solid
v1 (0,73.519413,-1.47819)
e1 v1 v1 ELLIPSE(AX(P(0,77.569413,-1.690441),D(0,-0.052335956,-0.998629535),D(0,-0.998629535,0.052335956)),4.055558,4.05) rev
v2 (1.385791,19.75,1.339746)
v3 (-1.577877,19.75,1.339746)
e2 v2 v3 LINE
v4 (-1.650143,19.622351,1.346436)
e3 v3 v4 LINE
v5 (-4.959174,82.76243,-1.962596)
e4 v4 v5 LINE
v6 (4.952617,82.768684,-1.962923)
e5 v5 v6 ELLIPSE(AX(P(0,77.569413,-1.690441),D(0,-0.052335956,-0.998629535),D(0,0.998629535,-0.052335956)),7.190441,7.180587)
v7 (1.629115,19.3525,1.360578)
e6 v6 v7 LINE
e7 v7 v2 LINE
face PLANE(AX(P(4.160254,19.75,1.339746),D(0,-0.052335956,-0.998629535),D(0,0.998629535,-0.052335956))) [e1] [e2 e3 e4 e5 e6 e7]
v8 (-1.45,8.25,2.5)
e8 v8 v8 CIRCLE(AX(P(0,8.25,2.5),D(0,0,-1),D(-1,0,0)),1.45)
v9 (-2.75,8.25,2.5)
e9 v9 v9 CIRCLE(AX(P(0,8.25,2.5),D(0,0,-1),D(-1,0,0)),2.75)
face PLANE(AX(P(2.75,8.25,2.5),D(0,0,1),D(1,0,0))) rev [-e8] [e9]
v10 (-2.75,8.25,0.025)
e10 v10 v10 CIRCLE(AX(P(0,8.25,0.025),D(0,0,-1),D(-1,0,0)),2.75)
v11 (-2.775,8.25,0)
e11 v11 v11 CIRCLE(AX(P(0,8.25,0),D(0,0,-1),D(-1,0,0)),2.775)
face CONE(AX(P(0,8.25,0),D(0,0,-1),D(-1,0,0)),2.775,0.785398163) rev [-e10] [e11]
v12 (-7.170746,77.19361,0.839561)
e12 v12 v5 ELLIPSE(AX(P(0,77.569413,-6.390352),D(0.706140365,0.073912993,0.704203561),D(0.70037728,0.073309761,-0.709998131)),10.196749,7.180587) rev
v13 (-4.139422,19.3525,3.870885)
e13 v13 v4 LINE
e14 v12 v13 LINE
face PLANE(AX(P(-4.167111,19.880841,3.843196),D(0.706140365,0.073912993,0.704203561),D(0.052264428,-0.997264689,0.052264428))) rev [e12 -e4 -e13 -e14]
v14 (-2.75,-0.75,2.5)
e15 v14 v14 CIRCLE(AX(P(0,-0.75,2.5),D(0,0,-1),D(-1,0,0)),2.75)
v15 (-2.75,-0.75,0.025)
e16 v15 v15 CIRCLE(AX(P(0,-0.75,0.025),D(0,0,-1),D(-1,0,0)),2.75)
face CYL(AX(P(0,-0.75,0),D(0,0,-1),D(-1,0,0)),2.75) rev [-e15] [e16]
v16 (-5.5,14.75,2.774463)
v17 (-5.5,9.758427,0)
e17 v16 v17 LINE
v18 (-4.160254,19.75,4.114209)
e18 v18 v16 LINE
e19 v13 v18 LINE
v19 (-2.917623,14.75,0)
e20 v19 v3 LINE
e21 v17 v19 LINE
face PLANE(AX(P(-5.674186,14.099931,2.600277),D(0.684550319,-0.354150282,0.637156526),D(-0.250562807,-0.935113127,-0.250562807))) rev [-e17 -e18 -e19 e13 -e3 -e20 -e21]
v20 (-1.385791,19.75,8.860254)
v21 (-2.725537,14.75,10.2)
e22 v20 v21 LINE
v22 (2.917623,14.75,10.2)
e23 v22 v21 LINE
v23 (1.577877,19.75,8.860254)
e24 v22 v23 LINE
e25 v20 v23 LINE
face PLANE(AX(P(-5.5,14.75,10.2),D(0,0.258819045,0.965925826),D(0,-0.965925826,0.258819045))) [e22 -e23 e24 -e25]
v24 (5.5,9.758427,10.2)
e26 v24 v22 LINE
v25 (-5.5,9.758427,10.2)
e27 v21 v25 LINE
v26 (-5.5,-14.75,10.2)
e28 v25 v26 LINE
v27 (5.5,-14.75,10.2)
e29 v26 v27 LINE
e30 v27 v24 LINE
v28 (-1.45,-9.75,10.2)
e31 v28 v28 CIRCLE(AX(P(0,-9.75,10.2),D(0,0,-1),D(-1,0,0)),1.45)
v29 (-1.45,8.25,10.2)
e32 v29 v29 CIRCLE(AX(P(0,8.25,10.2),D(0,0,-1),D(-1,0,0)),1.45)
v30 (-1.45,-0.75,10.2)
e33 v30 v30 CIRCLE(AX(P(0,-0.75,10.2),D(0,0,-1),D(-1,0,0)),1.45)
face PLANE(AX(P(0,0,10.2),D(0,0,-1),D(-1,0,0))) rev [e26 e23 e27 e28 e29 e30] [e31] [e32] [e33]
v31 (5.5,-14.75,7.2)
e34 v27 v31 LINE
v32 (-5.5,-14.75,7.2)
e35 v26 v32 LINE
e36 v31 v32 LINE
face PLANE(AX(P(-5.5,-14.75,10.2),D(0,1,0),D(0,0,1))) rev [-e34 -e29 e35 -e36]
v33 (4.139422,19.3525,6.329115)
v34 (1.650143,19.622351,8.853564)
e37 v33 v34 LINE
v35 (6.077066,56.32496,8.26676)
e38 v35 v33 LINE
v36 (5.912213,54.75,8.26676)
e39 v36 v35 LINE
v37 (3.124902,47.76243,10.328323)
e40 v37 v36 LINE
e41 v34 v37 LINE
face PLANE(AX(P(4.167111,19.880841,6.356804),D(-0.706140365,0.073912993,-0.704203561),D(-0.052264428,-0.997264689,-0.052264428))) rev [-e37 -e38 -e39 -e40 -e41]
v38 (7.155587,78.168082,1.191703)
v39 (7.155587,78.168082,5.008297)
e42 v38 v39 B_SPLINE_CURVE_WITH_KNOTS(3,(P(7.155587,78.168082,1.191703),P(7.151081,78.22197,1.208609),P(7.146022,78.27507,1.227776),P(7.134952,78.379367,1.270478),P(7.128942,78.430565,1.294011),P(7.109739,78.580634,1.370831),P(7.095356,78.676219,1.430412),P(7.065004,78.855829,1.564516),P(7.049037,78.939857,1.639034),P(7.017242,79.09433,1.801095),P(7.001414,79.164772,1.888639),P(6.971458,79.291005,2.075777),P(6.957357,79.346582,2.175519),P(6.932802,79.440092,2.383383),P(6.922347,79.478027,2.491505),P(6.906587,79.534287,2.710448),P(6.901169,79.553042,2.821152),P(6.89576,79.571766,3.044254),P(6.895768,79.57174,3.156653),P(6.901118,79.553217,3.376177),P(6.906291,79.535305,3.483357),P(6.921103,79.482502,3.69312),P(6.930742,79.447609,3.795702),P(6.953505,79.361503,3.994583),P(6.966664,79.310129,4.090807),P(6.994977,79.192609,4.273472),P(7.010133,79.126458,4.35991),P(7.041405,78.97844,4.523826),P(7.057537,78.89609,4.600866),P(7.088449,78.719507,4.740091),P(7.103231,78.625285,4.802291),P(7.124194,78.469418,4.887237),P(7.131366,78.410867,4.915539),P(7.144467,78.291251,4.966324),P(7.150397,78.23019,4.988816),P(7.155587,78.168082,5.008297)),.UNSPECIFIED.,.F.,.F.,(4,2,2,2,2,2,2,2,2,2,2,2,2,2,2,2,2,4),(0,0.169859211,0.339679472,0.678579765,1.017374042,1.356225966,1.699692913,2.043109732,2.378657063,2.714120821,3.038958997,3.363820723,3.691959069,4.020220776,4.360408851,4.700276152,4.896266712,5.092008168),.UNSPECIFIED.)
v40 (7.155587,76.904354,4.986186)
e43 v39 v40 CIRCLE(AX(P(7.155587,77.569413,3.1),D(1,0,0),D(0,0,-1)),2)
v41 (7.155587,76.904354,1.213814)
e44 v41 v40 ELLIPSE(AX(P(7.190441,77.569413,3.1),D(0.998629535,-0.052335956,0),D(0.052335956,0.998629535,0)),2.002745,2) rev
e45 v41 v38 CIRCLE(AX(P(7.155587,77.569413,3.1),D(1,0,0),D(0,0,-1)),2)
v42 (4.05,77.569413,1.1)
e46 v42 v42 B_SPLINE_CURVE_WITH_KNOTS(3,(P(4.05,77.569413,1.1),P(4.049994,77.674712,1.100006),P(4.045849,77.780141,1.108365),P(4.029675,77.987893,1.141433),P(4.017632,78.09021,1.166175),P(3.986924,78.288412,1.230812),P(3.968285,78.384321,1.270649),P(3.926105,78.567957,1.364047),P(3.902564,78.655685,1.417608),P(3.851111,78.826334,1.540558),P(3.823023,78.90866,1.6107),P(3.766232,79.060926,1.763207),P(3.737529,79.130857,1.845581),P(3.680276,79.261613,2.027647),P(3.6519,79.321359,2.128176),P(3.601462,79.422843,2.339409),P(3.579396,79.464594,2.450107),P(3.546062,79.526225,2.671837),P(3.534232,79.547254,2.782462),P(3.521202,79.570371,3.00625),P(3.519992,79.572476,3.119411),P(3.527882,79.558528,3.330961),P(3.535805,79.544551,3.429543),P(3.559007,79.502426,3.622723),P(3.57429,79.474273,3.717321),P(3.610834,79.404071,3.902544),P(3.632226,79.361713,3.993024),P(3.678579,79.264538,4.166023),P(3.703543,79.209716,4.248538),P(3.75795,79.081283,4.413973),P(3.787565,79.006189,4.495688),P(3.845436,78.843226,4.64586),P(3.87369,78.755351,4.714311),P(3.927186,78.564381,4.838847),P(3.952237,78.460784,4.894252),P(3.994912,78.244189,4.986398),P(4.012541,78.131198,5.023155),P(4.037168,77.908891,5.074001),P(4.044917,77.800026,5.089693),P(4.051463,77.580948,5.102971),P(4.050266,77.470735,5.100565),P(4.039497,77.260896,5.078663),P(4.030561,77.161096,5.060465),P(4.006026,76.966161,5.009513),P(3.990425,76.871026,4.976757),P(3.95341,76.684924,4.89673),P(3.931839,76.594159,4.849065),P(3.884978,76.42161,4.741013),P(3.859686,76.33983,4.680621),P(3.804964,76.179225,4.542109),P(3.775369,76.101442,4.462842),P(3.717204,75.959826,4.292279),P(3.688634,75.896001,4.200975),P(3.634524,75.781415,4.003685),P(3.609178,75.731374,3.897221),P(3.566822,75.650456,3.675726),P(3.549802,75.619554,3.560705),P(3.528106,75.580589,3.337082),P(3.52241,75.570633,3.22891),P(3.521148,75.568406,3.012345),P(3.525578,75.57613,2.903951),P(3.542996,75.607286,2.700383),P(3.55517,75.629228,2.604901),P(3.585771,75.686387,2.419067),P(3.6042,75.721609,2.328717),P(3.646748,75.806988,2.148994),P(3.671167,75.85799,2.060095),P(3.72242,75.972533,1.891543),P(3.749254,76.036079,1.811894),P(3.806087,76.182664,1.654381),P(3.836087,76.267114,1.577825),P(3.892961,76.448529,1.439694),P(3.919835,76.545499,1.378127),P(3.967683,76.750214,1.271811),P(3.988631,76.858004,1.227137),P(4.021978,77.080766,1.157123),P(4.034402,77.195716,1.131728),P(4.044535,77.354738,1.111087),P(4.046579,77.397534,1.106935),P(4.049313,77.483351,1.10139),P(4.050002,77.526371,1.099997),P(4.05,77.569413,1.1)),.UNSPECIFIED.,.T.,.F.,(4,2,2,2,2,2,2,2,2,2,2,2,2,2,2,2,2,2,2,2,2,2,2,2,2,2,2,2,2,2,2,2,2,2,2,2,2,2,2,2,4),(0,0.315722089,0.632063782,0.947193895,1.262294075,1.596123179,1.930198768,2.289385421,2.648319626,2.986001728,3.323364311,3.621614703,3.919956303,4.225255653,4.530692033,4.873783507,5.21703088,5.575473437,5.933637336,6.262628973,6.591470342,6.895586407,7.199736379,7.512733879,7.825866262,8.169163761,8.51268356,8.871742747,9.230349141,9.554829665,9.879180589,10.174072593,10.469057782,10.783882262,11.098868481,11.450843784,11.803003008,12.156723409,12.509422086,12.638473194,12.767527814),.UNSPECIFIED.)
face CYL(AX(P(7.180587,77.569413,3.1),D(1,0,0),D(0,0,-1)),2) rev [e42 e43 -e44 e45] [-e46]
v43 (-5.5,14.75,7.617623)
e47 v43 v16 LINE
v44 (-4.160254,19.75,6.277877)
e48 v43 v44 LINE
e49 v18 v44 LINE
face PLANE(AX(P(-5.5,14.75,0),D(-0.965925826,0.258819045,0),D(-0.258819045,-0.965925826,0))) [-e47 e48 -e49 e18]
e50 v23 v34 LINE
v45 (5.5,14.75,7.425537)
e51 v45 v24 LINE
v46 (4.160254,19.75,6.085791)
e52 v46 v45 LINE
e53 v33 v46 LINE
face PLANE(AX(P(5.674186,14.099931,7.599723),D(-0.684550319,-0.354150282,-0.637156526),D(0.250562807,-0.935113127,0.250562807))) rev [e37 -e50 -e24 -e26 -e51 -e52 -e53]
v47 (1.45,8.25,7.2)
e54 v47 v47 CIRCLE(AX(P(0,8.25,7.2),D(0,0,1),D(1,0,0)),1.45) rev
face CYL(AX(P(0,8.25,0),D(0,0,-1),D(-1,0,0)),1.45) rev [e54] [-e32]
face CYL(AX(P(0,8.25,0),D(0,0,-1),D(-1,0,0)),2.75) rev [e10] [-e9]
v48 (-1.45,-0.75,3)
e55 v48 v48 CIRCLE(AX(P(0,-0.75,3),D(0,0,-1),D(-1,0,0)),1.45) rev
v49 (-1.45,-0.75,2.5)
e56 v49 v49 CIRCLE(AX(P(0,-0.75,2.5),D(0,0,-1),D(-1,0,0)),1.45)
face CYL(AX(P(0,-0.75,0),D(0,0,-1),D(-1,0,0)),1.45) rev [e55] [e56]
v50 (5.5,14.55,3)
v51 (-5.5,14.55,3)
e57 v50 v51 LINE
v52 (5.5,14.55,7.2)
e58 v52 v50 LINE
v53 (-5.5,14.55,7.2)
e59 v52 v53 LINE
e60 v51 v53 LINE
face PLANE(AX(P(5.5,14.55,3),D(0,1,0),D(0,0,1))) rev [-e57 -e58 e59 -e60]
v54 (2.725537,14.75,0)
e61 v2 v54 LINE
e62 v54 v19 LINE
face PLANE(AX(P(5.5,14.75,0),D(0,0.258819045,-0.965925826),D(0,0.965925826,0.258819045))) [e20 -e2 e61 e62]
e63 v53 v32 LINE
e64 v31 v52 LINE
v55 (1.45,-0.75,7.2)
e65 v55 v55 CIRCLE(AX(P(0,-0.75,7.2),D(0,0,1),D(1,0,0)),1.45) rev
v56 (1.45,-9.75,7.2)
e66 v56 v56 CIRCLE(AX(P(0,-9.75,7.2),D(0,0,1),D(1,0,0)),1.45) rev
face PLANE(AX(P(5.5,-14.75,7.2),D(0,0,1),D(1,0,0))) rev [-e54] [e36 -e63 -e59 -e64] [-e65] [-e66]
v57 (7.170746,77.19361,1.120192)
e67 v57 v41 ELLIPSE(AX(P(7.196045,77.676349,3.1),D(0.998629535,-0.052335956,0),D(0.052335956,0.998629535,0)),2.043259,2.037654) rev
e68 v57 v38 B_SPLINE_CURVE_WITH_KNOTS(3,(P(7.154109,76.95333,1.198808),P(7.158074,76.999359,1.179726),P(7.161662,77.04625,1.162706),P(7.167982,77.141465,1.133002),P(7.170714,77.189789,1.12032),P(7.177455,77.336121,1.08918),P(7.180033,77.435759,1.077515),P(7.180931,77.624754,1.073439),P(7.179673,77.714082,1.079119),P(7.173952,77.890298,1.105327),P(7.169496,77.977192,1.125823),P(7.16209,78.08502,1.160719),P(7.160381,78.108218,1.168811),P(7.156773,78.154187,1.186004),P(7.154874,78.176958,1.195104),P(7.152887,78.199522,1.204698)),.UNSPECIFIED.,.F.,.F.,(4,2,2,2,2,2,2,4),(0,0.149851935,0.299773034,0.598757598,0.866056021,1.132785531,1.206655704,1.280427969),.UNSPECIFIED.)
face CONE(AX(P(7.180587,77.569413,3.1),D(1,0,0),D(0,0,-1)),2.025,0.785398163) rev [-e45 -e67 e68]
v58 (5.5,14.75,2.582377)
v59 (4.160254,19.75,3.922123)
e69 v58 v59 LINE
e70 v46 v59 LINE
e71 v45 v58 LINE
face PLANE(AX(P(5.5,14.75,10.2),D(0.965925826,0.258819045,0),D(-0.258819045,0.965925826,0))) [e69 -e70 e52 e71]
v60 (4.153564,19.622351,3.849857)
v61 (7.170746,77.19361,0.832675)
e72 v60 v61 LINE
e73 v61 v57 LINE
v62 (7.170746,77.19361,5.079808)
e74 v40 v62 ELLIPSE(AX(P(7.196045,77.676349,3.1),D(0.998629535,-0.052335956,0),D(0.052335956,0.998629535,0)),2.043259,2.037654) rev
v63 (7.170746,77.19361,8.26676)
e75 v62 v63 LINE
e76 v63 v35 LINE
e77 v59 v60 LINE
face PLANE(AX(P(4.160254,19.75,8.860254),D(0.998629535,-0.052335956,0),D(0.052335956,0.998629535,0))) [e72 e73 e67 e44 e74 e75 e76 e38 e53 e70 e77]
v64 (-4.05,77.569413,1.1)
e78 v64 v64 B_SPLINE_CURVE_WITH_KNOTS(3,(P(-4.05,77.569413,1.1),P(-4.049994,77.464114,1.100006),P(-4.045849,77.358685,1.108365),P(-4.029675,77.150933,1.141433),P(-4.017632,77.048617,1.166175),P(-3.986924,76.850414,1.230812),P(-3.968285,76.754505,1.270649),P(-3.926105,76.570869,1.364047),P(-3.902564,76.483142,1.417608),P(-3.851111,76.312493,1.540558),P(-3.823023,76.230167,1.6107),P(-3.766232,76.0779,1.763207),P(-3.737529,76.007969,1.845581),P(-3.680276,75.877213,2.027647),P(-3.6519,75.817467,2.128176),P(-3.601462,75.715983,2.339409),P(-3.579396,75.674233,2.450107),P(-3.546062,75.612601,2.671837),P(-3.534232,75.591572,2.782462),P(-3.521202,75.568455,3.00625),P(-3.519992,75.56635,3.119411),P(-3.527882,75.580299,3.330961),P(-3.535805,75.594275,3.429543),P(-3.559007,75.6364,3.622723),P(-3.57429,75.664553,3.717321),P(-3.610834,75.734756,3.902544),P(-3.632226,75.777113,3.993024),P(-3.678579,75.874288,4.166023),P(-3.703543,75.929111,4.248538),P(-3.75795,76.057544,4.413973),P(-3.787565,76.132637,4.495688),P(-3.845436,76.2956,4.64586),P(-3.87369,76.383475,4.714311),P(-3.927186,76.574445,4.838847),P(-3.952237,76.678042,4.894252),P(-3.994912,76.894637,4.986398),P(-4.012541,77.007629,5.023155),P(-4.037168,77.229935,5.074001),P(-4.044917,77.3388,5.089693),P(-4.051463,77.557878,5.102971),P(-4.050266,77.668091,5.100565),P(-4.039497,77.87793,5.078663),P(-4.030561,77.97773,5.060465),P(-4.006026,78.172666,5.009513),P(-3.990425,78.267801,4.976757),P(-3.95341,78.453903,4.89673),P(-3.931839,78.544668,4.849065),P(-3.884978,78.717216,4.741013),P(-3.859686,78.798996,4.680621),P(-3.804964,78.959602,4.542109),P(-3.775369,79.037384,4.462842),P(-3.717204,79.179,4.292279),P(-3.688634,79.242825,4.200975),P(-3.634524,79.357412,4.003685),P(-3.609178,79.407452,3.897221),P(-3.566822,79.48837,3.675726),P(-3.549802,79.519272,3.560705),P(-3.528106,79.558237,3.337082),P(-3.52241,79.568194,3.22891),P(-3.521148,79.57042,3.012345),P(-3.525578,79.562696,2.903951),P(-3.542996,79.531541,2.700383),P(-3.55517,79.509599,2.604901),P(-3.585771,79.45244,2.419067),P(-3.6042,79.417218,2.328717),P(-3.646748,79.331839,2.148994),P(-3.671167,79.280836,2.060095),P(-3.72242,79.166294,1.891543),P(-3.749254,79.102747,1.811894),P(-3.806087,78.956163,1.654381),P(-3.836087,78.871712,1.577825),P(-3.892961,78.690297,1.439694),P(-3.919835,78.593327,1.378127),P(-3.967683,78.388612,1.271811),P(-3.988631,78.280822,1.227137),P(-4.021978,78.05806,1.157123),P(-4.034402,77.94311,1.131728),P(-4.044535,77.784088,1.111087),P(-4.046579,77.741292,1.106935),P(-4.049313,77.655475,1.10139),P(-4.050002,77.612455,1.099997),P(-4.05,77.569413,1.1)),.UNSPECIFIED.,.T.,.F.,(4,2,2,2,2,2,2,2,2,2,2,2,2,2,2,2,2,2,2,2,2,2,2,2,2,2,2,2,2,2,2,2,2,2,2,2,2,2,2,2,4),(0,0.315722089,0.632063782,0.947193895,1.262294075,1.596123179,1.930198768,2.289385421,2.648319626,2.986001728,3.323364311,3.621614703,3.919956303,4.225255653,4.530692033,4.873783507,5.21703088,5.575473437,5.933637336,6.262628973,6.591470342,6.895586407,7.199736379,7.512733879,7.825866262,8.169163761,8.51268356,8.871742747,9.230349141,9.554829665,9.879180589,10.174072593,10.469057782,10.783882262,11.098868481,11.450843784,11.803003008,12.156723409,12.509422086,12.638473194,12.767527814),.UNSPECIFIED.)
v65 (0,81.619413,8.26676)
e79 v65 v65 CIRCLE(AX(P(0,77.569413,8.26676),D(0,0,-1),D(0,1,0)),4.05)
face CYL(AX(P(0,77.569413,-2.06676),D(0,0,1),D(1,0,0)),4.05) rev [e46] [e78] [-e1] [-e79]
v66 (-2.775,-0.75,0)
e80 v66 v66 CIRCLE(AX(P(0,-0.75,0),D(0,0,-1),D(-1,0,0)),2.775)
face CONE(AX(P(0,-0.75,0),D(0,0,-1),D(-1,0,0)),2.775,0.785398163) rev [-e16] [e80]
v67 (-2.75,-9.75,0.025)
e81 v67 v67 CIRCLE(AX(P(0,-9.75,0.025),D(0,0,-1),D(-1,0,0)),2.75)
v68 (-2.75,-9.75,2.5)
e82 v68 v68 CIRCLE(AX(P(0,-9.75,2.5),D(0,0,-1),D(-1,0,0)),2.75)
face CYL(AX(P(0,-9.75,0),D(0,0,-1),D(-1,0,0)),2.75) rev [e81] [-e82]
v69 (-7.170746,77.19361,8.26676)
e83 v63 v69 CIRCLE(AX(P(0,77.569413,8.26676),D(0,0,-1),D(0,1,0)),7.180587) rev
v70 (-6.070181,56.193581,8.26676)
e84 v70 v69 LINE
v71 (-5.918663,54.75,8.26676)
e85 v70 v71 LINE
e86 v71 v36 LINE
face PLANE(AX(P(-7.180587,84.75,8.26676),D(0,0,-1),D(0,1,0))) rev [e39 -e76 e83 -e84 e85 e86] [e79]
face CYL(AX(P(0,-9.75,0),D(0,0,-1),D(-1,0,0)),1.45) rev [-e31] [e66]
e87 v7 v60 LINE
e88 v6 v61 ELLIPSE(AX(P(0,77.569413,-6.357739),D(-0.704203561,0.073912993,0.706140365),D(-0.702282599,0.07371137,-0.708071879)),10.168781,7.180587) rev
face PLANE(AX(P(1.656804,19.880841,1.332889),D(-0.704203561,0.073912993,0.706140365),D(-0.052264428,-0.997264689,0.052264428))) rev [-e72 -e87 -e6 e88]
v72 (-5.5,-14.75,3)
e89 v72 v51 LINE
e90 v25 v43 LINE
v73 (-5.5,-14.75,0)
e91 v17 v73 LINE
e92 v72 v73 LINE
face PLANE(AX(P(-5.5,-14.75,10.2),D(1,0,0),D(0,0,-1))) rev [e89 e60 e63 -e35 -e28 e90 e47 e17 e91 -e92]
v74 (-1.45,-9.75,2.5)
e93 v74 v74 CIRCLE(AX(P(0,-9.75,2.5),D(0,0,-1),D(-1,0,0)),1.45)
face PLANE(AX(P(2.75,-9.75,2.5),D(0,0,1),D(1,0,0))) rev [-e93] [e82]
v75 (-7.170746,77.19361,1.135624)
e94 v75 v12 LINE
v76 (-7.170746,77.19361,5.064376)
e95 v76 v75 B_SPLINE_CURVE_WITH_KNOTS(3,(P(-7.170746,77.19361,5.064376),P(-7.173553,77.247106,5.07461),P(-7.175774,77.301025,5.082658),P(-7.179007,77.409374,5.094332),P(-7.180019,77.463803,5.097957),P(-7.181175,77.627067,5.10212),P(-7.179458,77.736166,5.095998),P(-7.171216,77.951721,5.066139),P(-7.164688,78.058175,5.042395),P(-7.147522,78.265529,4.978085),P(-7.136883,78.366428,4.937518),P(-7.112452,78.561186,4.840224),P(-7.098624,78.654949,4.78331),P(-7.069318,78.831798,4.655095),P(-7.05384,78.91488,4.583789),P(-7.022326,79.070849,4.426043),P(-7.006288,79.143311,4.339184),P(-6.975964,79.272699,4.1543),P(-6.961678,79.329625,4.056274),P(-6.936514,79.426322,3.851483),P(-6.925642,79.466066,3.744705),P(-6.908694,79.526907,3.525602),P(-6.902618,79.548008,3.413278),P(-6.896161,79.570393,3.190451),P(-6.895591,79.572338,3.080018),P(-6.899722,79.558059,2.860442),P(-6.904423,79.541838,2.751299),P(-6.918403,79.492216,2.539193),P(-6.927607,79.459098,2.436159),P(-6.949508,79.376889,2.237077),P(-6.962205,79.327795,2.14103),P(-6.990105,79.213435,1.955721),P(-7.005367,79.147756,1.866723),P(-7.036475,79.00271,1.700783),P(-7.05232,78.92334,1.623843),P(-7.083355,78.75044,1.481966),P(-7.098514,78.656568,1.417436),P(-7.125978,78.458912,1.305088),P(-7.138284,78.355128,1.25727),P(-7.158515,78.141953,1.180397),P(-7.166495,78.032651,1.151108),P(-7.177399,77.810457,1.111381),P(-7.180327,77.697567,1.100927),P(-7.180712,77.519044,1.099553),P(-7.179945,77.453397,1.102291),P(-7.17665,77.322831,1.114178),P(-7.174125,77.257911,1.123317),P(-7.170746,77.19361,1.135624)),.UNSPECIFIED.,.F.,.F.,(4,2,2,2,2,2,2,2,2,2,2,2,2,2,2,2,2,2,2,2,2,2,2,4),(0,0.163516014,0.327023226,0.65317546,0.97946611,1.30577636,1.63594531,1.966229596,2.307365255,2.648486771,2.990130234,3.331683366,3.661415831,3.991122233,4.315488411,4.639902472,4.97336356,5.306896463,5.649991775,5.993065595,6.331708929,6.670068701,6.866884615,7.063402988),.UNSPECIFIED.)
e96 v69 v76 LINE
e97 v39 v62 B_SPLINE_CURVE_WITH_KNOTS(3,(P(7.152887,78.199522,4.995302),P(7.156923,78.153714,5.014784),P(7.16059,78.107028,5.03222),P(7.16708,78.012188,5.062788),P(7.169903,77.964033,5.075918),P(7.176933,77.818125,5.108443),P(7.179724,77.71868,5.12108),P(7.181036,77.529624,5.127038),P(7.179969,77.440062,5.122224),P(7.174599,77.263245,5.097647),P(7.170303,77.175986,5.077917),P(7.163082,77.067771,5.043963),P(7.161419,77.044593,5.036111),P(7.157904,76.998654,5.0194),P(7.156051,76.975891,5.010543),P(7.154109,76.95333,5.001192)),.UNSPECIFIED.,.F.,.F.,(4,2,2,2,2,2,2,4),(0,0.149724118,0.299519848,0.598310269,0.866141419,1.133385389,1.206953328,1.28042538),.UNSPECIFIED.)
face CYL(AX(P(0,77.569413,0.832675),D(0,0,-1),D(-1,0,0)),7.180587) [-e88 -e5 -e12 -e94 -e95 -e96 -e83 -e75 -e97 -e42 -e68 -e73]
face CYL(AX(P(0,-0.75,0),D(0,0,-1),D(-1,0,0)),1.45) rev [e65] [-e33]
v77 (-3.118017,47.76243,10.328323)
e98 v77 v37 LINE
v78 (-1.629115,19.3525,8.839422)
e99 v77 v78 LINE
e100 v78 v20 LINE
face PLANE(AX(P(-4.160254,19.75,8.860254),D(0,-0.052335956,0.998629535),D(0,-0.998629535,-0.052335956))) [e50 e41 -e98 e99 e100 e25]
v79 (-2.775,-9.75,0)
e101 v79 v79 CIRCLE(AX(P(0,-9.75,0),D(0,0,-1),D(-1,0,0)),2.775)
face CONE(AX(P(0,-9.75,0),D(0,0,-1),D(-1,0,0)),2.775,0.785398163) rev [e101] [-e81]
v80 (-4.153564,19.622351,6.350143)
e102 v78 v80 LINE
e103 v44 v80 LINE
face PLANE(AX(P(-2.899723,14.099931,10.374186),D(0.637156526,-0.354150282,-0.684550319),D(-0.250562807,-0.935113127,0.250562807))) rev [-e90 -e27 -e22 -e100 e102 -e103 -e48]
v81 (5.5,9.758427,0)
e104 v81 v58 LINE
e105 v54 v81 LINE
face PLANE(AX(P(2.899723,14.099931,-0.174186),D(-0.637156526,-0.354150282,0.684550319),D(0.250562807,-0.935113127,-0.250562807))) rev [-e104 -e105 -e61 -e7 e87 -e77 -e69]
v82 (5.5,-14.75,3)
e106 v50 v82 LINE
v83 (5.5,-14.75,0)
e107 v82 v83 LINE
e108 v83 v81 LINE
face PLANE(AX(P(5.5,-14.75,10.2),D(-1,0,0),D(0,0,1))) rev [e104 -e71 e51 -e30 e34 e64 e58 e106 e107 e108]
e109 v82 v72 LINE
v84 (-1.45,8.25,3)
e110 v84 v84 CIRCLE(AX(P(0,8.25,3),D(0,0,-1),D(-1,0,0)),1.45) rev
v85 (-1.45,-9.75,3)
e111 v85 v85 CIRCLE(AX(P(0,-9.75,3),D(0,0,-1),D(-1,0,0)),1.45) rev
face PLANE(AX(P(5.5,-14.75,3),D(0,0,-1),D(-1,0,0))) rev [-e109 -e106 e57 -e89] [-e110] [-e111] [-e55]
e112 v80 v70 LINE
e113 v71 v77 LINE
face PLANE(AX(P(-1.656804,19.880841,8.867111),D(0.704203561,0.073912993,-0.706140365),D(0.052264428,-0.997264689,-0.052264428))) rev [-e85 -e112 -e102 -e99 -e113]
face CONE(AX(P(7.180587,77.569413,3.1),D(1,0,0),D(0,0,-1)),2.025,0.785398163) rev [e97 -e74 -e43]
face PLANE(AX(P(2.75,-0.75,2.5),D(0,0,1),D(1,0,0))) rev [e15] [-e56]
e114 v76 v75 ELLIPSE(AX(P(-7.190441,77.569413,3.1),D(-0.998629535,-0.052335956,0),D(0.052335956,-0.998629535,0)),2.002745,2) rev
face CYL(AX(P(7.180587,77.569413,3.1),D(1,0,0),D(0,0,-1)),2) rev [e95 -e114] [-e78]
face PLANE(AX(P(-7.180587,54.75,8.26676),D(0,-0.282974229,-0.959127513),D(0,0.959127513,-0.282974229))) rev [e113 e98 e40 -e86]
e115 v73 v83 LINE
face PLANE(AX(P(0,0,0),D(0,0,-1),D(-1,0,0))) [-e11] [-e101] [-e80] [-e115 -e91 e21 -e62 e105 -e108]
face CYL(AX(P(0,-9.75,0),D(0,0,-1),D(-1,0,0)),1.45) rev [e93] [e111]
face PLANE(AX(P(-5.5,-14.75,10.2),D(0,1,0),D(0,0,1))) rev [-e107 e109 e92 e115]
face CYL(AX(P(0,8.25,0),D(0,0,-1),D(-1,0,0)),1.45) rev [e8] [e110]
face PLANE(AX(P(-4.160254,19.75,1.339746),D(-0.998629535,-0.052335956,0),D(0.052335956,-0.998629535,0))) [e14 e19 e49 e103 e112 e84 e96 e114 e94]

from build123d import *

# Parameters (mm, degrees)
SKETCH1_W                       = 11
SKETCH1_H                       = 29.5
BOSS_EXTRUDE1_DEPTH             = 10.2
CBORE_FOR_M2_5_SHCS1_AT_2_COUNT = 2
CBORE_FOR_M2_5_SHCS1_AT_2_PITCH = 9
CBORE_FOR_M2_5_SHCS1_AT_3_COUNT = 2
CBORE_FOR_M2_5_SHCS1_AT_3_PITCH = 18
CUT_EXTRUDE1_DEPTH              = 22.038120163
CUT_EXTRUDE1_DEPTH_BACK         = 22.038120163
SKETCH5_W                       = 4.2
SKETCH5_H                       = 29.3
SKETCH6_W                       = 11
SKETCH6_H                       = 10.2
BOSS_EXTRUDE2_DEPTH             = 5
BOSS_EXTRUDE2_TAPER             = 15
SKETCH7_W                       = 8.320508076
SKETCH7_H                       = 7.520508076
BOSS_EXTRUDE3_DEPTH             = 65
BOSS_EXTRUDE3_DRAFT             = -3
CHAMFER1_SIZE                   = 2.685958206
CHAMFER1_SIZE_2                 = 2.5
CHAMFER1_SIZE_3                 = 2.506875868
FILLET1_R                       = 7.180587
CUT_EXTRUDE2_DEPTH              = 87.566929667
CUT_EXTRUDE2_DEPTH_BACK         = 87.566929667
CUT_EXTRUDE4_DEPTH              = 86.67908162
CUT_EXTRUDE4_DEPTH_BACK         = 86.67908162
SKETCH13_R                      = 4.05
F_4_0MM_DOWEL_HOLE1_OUTLINE_W   = 2
F_4_0MM_DOWEL_HOLE1_OUTLINE_H   = 3.659209284


# Read off the part's stored shape, not the designer's step: Ø4.0mm Dowel Hole1
# Some blends are built 0.0001 mm under size
with BuildPart() as part:
    # Sketch1 → Boss-Extrude1 (new body)
    with BuildSketch(Plane.XY):
        Rectangle(SKETCH1_W, SKETCH1_H)
    extrude(amount=BOSS_EXTRUDE1_DEPTH)

    # Sketch4 → CBORE for M2.5 SHCS1 (revolve, cut)
    with BuildSketch(Plane(origin=(0, -9.75, 0), x_dir=(0, 1, 0), z_dir=(1, 0, 0))):
        Polygon((0, 0), (0, 10.2), (1.45, 10.2), (1.45, 2.5), (2.75, 2.5), (2.75, 0.025), (2.775, 0), align=None)
    cbore_for_m2_5_shcs1 = revolve(axis=Axis((0, -9.75, -6.35), (0, 0, 1)), mode=Mode.SUBTRACT)

    # CBORE for M2.5 SHCS1 at 2: CBORE for M2.5 SHCS1 ×2
    with Locations(*[(0, i * CBORE_FOR_M2_5_SHCS1_AT_2_PITCH, 0) for i in range(1, CBORE_FOR_M2_5_SHCS1_AT_2_COUNT)]):
        add(cbore_for_m2_5_shcs1, mode=Mode.SUBTRACT)

    # CBORE for M2.5 SHCS1 at 3: CBORE for M2.5 SHCS1 ×2
    with Locations(*[(0, i * CBORE_FOR_M2_5_SHCS1_AT_3_PITCH, 0) for i in range(1, CBORE_FOR_M2_5_SHCS1_AT_3_COUNT)]):
        add(cbore_for_m2_5_shcs1, mode=Mode.SUBTRACT)

    # Sketch5 → Cut-Extrude1 (cut, two sides: drawn at the far end of the back side and taken through both)
    with BuildSketch(Plane.ZY.offset(5.5).offset(-CUT_EXTRUDE1_DEPTH_BACK)):
        with Locations((5.1, -0.1)):
            Rectangle(SKETCH5_W, SKETCH5_H)
    extrude(amount=CUT_EXTRUDE1_DEPTH + CUT_EXTRUDE1_DEPTH_BACK, mode=Mode.SUBTRACT)

    # Sketch6 → Boss-Extrude2 (add)
    with BuildSketch(Plane(origin=(0, 14.75, 0), x_dir=(1, 0, 0), z_dir=(0, 1, 0))):
        with Locations((0, -5.1)):
            Rectangle(SKETCH6_W, SKETCH6_H)
    extrude(amount=BOSS_EXTRUDE2_DEPTH, taper=BOSS_EXTRUDE2_TAPER)


with BuildPart() as boss_extrude3_tool:
    # Sketch7 → Boss-Extrude3 (with draft: the straight prism first)
    with BuildSketch(Plane(origin=(0, 19.75, 0), x_dir=(1, 0, 0), z_dir=(0, 1, 0))):
        with Locations((0, -5.1)):
            Rectangle(SKETCH7_W, SKETCH7_H)
    extrude(amount=BOSS_EXTRUDE3_DEPTH)
    # Boss-Extrude3: the draft: its side faces are tilted about the plane it starts from
    boss_extrude3_sides = [boss_extrude3_tool.faces().sort_by_distance(p)[0] for p in [
        (4.160254038, 52.25, 5.1),
        (0, 52.25, 1.339745962),
        (-4.160254038, 52.25, 5.1),
        (0, 52.25, 8.860254038),
    ]]
    draft(boss_extrude3_sides, Plane(origin=(0, 19.75, 0), x_dir=(1, 0, 0), z_dir=(0, 1, 0)), BOSS_EXTRUDE3_DRAFT)


with BuildPart() as part_1:
    add(part.part)

    # Boss-Extrude3: add boss_extrude3_tool
    add(boss_extrude3_tool.part)

    # Chamfer1
    # the kernel refuses this chamfer: 2.685958206, 2.506875868, 2.5 mm, written as the material it takes off along each edge
    with BuildSketch(Plane(origin=(7.233738269, 8.279600693, 11.933738269), x_dir=(0.08950679865400309, -0.23533376139402715, -0.967784352912802), z_dir=(-0.25056280708573236, 0.9351131265310291, -0.25056280708573203))) as chamfer1_piece_1_section:
        Polygon((CHAMFER1_SIZE * 0.999673594955, CHAMFER1_SIZE * 0.0255480690476), (-CHAMFER1_SIZE_2 * 0.0924561168006, CHAMFER1_SIZE_2 * 0.995716760161), (0, 0), align=None)
    chamfer1_piece_1 = extrude(amount=19.185698612, mode=Mode.PRIVATE)
    chamfer1_piece_1 = split(chamfer1_piece_1, bisect_by=Plane(origin=(4.749112244, 14.607483703, 8.590746179), z_dir=(0, -0.05233595624294391, 0.9986295347545739)), keep=Keep.TOP, mode=Mode.PRIVATE)
    add(chamfer1_piece_1, mode=Mode.SUBTRACT)
    with BuildSketch(Plane(origin=(7.233738269, 8.279600693, 11.933738269), x_dir=(0.08950679865400309, -0.23533376139402715, -0.967784352912802), z_dir=(-0.25056280708573236, 0.9351131265310291, -0.25056280708573203))) as chamfer1_piece_2_section:
        Polygon((CHAMFER1_SIZE * 0.999673594955, CHAMFER1_SIZE * 0.0255480690476), (-CHAMFER1_SIZE_2 * 0.0924561168006, CHAMFER1_SIZE_2 * 0.995716760161), (0, 0), align=None)
    chamfer1_piece_2 = extrude(amount=19.185698612, mode=Mode.PRIVATE)
    chamfer1_piece_2 = split(chamfer1_piece_2, bisect_by=Plane(origin=(4.006118706, 16.808922673, 7.98117222), z_dir=(0.9986295347545739, -0.05233595624294391, 0)), keep=Keep.TOP, mode=Mode.PRIVATE)
    add(chamfer1_piece_2, mode=Mode.SUBTRACT)
    with BuildSketch(Plane(origin=(7.233738269, 8.279600693, -1.733738269), x_dir=(-0.967784352912802, -0.23533376139402723, -0.08950679865400304), z_dir=(-0.25056280708573203, 0.9351131265310291, 0.25056280708573203))) as chamfer1_piece_3_section:
        Polygon((CHAMFER1_SIZE * 0.999673594955, CHAMFER1_SIZE * 0.0255480690476), (-CHAMFER1_SIZE_2 * 0.0924561168006, CHAMFER1_SIZE_2 * 0.995716760161), (0, 0), align=None)
    chamfer1_piece_3 = extrude(amount=19.185698612, mode=Mode.PRIVATE)
    chamfer1_piece_3 = split(chamfer1_piece_3, bisect_by=Plane(origin=(3.890746179, 14.607483703, 0.750887756), z_dir=(0.9986295347545739, -0.05233595624294391, 0)), keep=Keep.TOP, mode=Mode.PRIVATE)
    add(chamfer1_piece_3, mode=Mode.SUBTRACT)
    with BuildSketch(Plane(origin=(7.233738269, 8.279600693, -1.733738269), x_dir=(-0.967784352912802, -0.23533376139402723, -0.08950679865400304), z_dir=(-0.25056280708573203, 0.9351131265310291, 0.25056280708573203))) as chamfer1_piece_4_section:
        Polygon((CHAMFER1_SIZE * 0.999673594955, CHAMFER1_SIZE * 0.0255480690476), (-CHAMFER1_SIZE_2 * 0.0924561168006, CHAMFER1_SIZE_2 * 0.995716760161), (0, 0), align=None)
    chamfer1_piece_4 = extrude(amount=19.185698612, mode=Mode.PRIVATE)
    chamfer1_piece_4 = split(chamfer1_piece_4, bisect_by=Plane(origin=(3.28117222, 16.808922673, 1.493881294), z_dir=(0, -0.05233595624294391, -0.9986295347545739)), keep=Keep.TOP, mode=Mode.PRIVATE)
    add(chamfer1_piece_4, mode=Mode.SUBTRACT)
    with BuildSketch(Plane(origin=(-7.233738269, 8.279600693, -1.733738269), x_dir=(0.9676796057430587, -0.2342901423618477, -0.09329689073610087), z_dir=(0.25056280708573236, 0.9351131265310291, 0.25056280708573203))) as chamfer1_piece_5_section:
        Polygon((CHAMFER1_SIZE_2 * 0.999565396144, -CHAMFER1_SIZE_2 * 0.0294791253514), (-CHAMFER1_SIZE * 0.0963710953578, -CHAMFER1_SIZE * 0.995345473824), (0, 0), align=None)
    chamfer1_piece_5 = extrude(amount=19.185698612, mode=Mode.PRIVATE)
    chamfer1_piece_5 = split(chamfer1_piece_5, bisect_by=Plane(origin=(-3.890770711, 14.607951798, 0.759844086), z_dir=(-0.9986295347545739, -0.05233595624294391, 0)), keep=Keep.TOP, mode=Mode.PRIVATE)
    add(chamfer1_piece_5, mode=Mode.SUBTRACT)
    with BuildSketch(Plane(origin=(-7.233738269, 8.279600693, -1.733738269), x_dir=(0.9676796057430587, -0.2342901423618477, -0.09329689073610087), z_dir=(0.25056280708573236, 0.9351131265310291, 0.25056280708573203))) as chamfer1_piece_6_section:
        Polygon((CHAMFER1_SIZE_2 * 0.999565396144, -CHAMFER1_SIZE_2 * 0.0294791253514), (-CHAMFER1_SIZE * 0.0963710953578, -CHAMFER1_SIZE * 0.995345473824), (0, 0), align=None)
    chamfer1_piece_6 = extrude(amount=19.185698612, mode=Mode.PRIVATE)
    chamfer1_piece_6 = split(chamfer1_piece_6, bisect_by=Plane(origin=(-3.341994856, 16.885507899, 1.489867632), z_dir=(0, -0.05233595624294391, -0.9986295347545739)), keep=Keep.TOP, mode=Mode.PRIVATE)
    add(chamfer1_piece_6, mode=Mode.SUBTRACT)
    with BuildSketch(Plane(origin=(-7.233738269, 8.279600693, 11.933738269), x_dir=(-0.09329689073610087, -0.2342901423618474, -0.9676796057430587), z_dir=(0.25056280708573203, 0.9351131265310291, -0.25056280708573203))) as chamfer1_piece_7_section:
        Polygon((CHAMFER1_SIZE_2 * 0.999565396144, -CHAMFER1_SIZE_2 * 0.0294791253514), (-CHAMFER1_SIZE * 0.0963710953578, -CHAMFER1_SIZE * 0.995345473824), (0, 0), align=None)
    chamfer1_piece_7 = extrude(amount=19.185698612, mode=Mode.PRIVATE)
    chamfer1_piece_7 = split(chamfer1_piece_7, bisect_by=Plane(origin=(-4.740155914, 14.607951798, 8.590770711), z_dir=(0, -0.05233595624294391, 0.9986295347545739)), keep=Keep.TOP, mode=Mode.PRIVATE)
    add(chamfer1_piece_7, mode=Mode.SUBTRACT)
    with BuildSketch(Plane(origin=(-7.233738269, 8.279600693, 11.933738269), x_dir=(-0.09329689073610087, -0.2342901423618474, -0.9676796057430587), z_dir=(0.25056280708573203, 0.9351131265310291, -0.25056280708573203))) as chamfer1_piece_8_section:
        Polygon((CHAMFER1_SIZE_2 * 0.999565396144, -CHAMFER1_SIZE_2 * 0.0294791253514), (-CHAMFER1_SIZE * 0.0963710953578, -CHAMFER1_SIZE * 0.995345473824), (0, 0), align=None)
    chamfer1_piece_8 = extrude(amount=19.185698612, mode=Mode.PRIVATE)
    chamfer1_piece_8 = split(chamfer1_piece_8, bisect_by=Plane(origin=(-4.010132368, 16.885507899, 8.041994856), z_dir=(-0.9986295347545739, -0.05233595624294391, 0)), keep=Keep.TOP, mode=Mode.PRIVATE)
    add(chamfer1_piece_8, mode=Mode.SUBTRACT)
    # the kernel refuses this chamfer: 2.685958206, 2.506875868, 2.5 mm, written as the material it takes off along each edge
    with BuildSketch(Plane(origin=(-3.604484305, 9.145281757, 8.304484305), x_dir=(0.998257838122397, 0.05073820775547923, 0.03011516064974776), z_dir=(-0.052264427688714005, 0.9972646886342373, 0.05226442768871396))) as chamfer1_2_piece_1_section:
        Polygon((CHAMFER1_SIZE_3 * 0.999624043446, CHAMFER1_SIZE_3 * 0.0274184562475), (-CHAMFER1_SIZE_2 * 0.0301563759466, CHAMFER1_SIZE_2 * 0.99954519307), (0, 0), align=None)
    chamfer1_2_piece_1 = extrude(amount=82.259449266, mode=Mode.PRIVATE)
    chamfer1_2_piece_1 = split(chamfer1_2_piece_1, bisect_by=Plane(origin=(4.065038814, 46.715563442, -0.016857923), z_dir=(-0.6371565255737595, 0.35415028175354435, 0.6845503194452988)), keep=Keep.TOP, mode=Mode.PRIVATE)
    add(chamfer1_2_piece_1, mode=Mode.SUBTRACT)
    with BuildSketch(Plane(origin=(7.903727343, 91.179725817, 12.603727343), x_dir=(-0.9982536933382549, 0.05073009352715152, 0.0302658445654427), z_dir=(-0.05226442768871403, -0.9972646886342373, -0.05226442768871396))) as chamfer1_2_piece_2_section:
        Polygon((CHAMFER1_SIZE_2 * 0.999619893, CHAMFER1_SIZE_2 * 0.0275693583223), (-CHAMFER1_SIZE_3 * 0.0303072660864, CHAMFER1_SIZE_3 * 0.999540629289), (0, 0), align=None)
    chamfer1_2_piece_2 = extrude(amount=82.259449266, mode=Mode.PRIVATE)
    chamfer1_2_piece_2 = split(chamfer1_2_piece_2, bisect_by=Plane(origin=(-4.73972724, 46.729717564, 0.651664322), z_dir=(0.6845503194452992, 0.35415028175354457, 0.6371565255737587)), keep=Keep.TOP, mode=Mode.PRIVATE)
    add(chamfer1_2_piece_2, mode=Mode.SUBTRACT)
    with BuildSketch(Plane(origin=(7.903727343, 91.179725817, -2.403727343), x_dir=(-0.998257838122397, 0.05073820775547923, -0.030115160649747844), z_dir=(-0.052264427688714005, -0.9972646886342373, 0.052264427688714005))) as chamfer1_2_piece_3_section:
        Polygon((CHAMFER1_SIZE_3 * 0.999624043446, -CHAMFER1_SIZE_3 * 0.0274184562475), (-CHAMFER1_SIZE_2 * 0.0301563759466, -CHAMFER1_SIZE_2 * 0.99954519307), (0, 0), align=None)
    chamfer1_2_piece_3 = extrude(amount=82.259449266, mode=Mode.PRIVATE)
    chamfer1_2_piece_3 = split(chamfer1_2_piece_3, bisect_by=Plane(origin=(-4.265855273, 47.413955288, 10.391255842), z_dir=(0.6371565255737592, 0.35415028175354435, -0.6845503194452989)), keep=Keep.TOP, mode=Mode.PRIVATE)
    add(chamfer1_2_piece_3, mode=Mode.SUBTRACT)
    with BuildSketch(Plane(origin=(-3.604484305, 9.145281757, 1.895515695), x_dir=(-0.030115160649747664, 0.05073820775547925, 0.998257838122397), z_dir=(-0.05226442768871402, 0.9972646886342373, -0.052264427688714025))) as chamfer1_2_piece_4_section:
        Polygon((CHAMFER1_SIZE_3 * 0.999624043446, CHAMFER1_SIZE_3 * 0.0274184562475), (-CHAMFER1_SIZE_2 * 0.0301563759466, CHAMFER1_SIZE_2 * 0.99954519307), (0, 0), align=None)
    chamfer1_2_piece_4 = extrude(amount=82.259449266, mode=Mode.PRIVATE)
    chamfer1_2_piece_4 = split(chamfer1_2_piece_4, bisect_by=Plane(origin=(-2.919667619, 22.551503967, 4.338501317), z_dir=(-0.6845503194452986, 0.35415028175354457, -0.6371565255737593)), keep=Keep.TOP, mode=Mode.PRIVATE)
    add(chamfer1_2_piece_4, mode=Mode.SUBTRACT)

    # Fillet1
    fillet1_edges = [part_1.edges().sort_by_distance(p)[0] for p in [
        (-7.566759691, 84.75, 5.103442639),
        (7.566759691, 84.75, 5.096557361),
    ]]
    fillet(fillet1_edges, radius=FILLET1_R - 0.0001)  # a hair under: the kernel refuses the full size

    # Sketch8 → Cut-Extrude2 (cut, two sides: drawn at the far end of the back side and taken through both)
    with BuildSketch(Plane(origin=(5.5, 0, 0), x_dir=(0, 0, -1), z_dir=(1, 0, 0)).offset(-CUT_EXTRUDE2_DEPTH_BACK)):
        Polygon((-8.266759691, 84.75), (-8.266759691, 54.75), (-10.328323266, 47.762429615), (-12.162595541, 82.762429615), (-12.266759691, 84.75), align=None)
    extrude(amount=CUT_EXTRUDE2_DEPTH + CUT_EXTRUDE2_DEPTH_BACK, mode=Mode.SUBTRACT)

    # Sketch13 → Cut-Extrude4 (cut, two sides: drawn at the far end of the back side and taken through both)
    with BuildSketch(Plane.XY.offset(8.266759691).offset(-CUT_EXTRUDE4_DEPTH_BACK)):
        with Locations(Location((0, 77.569413168, 0), (0, 0, 90))):
            Circle(SKETCH13_R)
    extrude(amount=CUT_EXTRUDE4_DEPTH + CUT_EXTRUDE4_DEPTH_BACK, mode=Mode.SUBTRACT)

    # Ø4.0mm Dowel Hole1 outline → Ø4.0mm Dowel Hole1 (revolve, cut)
    with BuildSketch(Plane(origin=(0, 77.569413168, 3.1), x_dir=(0, 1, 0), z_dir=(0, 0, -1))):
        with Locations((1, -5.351071492)):
            Rectangle(F_4_0MM_DOWEL_HOLE1_OUTLINE_W, F_4_0MM_DOWEL_HOLE1_OUTLINE_H)
        Polygon((0, 3.52146685), (2, 3.52146685), (2, 7.155586832), (2, 7.180612509), (0, 7.180612509), align=None)
        Polygon((2, 7.180612509), (2, 7.155586674), (2.025011882, 7.180598714), align=None)
    revolve(axis=Axis((0, 77.569413168, 3.1), (1, 0, 0)), mode=Mode.SUBTRACT)


solid = part_1.part
